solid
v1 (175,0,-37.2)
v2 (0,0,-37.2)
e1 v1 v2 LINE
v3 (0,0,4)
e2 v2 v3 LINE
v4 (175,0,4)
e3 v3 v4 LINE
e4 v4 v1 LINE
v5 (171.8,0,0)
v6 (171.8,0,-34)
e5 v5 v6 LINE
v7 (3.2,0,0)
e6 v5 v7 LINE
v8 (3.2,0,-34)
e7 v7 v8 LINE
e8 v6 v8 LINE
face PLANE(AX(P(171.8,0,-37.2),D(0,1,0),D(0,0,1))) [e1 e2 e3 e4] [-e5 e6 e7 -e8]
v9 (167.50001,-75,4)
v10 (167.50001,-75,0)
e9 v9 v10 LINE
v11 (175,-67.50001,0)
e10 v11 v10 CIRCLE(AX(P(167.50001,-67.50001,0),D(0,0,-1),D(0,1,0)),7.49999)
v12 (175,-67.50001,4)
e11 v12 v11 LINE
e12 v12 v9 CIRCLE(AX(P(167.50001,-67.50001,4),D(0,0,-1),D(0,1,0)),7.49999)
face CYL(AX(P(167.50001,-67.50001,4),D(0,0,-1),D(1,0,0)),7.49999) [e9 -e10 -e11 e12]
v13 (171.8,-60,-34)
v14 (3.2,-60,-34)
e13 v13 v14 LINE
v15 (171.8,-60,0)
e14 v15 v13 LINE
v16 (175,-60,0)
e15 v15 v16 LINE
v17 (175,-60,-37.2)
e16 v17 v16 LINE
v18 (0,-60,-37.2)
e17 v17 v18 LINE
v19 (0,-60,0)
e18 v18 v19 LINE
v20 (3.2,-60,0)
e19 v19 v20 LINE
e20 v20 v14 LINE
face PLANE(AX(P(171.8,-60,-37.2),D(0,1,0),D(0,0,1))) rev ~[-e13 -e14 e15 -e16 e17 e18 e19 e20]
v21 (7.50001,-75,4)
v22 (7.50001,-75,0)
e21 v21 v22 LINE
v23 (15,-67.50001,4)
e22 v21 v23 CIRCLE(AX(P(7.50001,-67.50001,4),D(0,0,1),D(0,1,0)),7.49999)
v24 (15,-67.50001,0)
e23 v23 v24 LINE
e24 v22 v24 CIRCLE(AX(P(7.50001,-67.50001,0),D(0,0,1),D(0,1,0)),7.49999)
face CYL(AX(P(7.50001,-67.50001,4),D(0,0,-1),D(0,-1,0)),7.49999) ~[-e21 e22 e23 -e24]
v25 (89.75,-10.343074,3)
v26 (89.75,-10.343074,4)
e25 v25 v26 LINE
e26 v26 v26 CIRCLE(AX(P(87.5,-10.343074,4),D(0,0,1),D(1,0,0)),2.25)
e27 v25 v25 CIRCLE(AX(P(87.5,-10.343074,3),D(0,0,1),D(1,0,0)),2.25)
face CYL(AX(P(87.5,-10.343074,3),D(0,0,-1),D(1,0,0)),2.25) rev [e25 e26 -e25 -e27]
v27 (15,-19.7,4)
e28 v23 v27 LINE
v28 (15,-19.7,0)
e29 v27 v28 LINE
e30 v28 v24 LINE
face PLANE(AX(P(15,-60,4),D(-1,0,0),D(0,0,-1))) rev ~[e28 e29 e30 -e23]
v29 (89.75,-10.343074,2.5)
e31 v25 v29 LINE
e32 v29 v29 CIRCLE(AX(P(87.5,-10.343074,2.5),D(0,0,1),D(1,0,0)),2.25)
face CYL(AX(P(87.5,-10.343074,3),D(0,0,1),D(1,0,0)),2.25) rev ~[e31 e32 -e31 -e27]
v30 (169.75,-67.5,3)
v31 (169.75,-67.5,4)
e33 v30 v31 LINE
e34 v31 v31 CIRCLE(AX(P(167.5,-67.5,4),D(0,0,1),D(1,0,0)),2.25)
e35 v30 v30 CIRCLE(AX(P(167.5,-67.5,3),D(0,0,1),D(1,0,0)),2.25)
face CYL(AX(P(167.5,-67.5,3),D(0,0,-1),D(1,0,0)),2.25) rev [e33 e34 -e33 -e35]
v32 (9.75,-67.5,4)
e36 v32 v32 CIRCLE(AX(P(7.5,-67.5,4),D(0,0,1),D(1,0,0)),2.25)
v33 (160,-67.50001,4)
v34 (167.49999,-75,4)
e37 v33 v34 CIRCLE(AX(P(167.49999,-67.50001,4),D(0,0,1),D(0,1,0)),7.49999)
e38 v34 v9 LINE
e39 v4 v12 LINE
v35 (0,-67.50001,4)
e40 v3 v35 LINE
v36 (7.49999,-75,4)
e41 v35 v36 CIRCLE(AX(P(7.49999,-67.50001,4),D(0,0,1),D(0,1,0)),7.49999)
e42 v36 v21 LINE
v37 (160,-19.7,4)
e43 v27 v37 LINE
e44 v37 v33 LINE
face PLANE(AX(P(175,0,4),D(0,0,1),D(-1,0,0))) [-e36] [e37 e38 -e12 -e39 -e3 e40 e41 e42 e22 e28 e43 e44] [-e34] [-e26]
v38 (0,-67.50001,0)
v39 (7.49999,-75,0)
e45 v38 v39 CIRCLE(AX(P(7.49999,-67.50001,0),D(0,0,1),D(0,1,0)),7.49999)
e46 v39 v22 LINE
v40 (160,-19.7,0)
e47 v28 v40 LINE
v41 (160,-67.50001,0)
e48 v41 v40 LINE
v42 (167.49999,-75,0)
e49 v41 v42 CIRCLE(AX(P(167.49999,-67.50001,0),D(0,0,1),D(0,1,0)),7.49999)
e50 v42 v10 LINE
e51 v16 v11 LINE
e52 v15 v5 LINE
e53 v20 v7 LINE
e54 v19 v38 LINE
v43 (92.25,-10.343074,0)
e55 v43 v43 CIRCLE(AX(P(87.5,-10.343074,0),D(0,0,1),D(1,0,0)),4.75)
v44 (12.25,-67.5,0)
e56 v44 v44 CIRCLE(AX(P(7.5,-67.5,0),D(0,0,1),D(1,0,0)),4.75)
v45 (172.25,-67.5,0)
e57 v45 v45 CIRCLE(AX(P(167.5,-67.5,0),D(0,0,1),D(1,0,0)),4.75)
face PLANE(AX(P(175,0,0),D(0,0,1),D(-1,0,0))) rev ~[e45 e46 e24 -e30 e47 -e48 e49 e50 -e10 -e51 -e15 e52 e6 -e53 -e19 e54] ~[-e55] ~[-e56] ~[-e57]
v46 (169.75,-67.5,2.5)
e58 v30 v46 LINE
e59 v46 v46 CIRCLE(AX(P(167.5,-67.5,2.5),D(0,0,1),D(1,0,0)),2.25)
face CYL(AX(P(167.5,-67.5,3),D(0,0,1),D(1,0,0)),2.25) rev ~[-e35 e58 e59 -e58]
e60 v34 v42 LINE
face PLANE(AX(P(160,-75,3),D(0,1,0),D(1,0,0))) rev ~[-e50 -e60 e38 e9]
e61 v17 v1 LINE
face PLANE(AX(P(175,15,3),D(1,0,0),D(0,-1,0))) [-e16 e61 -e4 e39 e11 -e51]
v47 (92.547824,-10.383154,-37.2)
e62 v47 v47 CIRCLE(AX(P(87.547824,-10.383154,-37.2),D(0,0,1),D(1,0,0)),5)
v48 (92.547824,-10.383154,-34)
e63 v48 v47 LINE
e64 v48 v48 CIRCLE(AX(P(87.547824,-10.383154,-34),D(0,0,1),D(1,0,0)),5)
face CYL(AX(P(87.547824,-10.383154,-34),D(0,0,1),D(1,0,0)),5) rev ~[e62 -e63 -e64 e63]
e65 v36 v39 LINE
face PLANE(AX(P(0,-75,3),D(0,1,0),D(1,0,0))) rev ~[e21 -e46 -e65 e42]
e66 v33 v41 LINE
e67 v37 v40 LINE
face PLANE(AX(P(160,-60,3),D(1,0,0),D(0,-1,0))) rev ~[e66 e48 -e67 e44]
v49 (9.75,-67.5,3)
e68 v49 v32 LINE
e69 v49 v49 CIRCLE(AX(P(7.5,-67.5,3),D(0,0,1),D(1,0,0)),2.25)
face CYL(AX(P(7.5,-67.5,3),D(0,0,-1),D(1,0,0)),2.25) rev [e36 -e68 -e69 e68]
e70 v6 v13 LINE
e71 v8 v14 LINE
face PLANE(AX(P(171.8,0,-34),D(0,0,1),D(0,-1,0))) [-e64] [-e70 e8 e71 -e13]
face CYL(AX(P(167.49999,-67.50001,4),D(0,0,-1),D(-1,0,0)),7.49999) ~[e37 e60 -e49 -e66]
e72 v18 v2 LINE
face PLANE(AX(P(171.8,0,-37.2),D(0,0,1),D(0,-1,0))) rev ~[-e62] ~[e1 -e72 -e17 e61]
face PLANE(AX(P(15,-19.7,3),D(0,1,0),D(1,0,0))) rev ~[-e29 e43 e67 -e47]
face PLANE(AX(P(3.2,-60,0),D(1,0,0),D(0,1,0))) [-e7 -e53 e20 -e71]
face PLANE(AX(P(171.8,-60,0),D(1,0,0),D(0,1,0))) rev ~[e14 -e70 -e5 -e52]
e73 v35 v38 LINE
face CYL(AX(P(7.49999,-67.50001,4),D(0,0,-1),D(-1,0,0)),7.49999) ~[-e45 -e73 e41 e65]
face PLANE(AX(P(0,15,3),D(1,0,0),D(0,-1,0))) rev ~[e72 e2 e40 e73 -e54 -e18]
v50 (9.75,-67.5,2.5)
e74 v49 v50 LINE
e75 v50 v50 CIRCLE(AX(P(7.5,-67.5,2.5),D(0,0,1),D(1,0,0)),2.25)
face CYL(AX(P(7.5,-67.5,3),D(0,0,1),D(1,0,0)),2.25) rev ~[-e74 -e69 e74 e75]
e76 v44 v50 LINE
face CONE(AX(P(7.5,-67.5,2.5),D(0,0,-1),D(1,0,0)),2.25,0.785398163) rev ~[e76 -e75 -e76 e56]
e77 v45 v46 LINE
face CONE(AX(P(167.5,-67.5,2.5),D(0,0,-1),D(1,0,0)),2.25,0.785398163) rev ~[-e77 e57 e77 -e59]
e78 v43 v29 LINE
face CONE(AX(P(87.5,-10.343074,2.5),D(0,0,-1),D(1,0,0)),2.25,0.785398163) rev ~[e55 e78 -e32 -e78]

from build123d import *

# Parameters (mm, degrees)
F0_W      = 3.2
F0_H      = 60
F0_W_2    = 168.6
F1_DEPTH  = 3
F2_DEPTH  = 37.2
F3_W      = 60
F3_H      = 3.2
F4_DEPTH  = 168.6
F5_W      = 15
F5_H      = 3
F6_DEPTH  = 15
F7_W      = 15
F7_H      = 3
F8_DEPTH  = 15
F9_R      = 2.25
F10_DEPTH = 25
F11_DEPTH = 1
F12_SIZE  = 2.5
F13_W     = 35.8230434358
F13_H     = 13.5607076809
F14_DEPTH = 175.001
F15_R     = 5
F16_DEPTH = 25
F17_R     = 7.49999
F18_DEPTH = 40.3


# Not quite as in the source:
# - a fillet or chamfer is up to 0.001 mm smaller than in the source, because OpenCascade refuses the exact size


with BuildPart() as f1:
    # F0 (on Top) → F1 (new body)
    with BuildSketch(Plane.XY):
        with Locations((1.6, -30)):
            Rectangle(F0_W, F0_H)
        with Locations((87.5, -30)):
            Rectangle(F0_W_2, F0_H)
        with Locations((173.4, -30)):
            Rectangle(F0_W, F0_H)
    extrude(amount=F1_DEPTH)

    # F0 (on Top) → F2 (join)
    with BuildSketch(Plane.XY):
        with Locations((1.6, -30)):
            Rectangle(F0_W, F0_H)
        with Locations((173.4, -30)):
            Rectangle(F0_W, F0_H)
    extrude(amount=-F2_DEPTH)

    # F3 (on face) → F4 (join, through all)
    with BuildSketch(Plane(origin=(171.8, 0, 0), x_dir=(0, -1, 0), z_dir=(-1, 0, 0))):
        with Locations((30, -35.6)):
            Rectangle(F3_W, F3_H)
    extrude(amount=F4_DEPTH)

    # F5 (on face) → F6 (join)
    with BuildSketch(Plane.XZ.offset(60)):
        with Locations((7.5, 1.5)):
            Rectangle(F5_W, F5_H)
        with Locations((167.5, 1.5)):
            Rectangle(F5_W, F5_H)
    extrude(amount=F6_DEPTH)

    # F7 (on face) → F8 (join)
    with BuildSketch(Plane(origin=(0, 0, 0), x_dir=(-1, 0, 0), z_dir=(0, 1, 0))):
        with Locations((-167.5, 1.5)):
            Rectangle(F7_W, F7_H)
        with Locations((-7.5, 1.5)):
            Rectangle(F7_W, F7_H)
    extrude(amount=F8_DEPTH)

    # F9 (on face) → F10 (cut)
    with BuildSketch(Plane.XY.offset(3)):
        with Locations((167.5, 7.5)):
            Circle(F9_R)
        with Locations((167.5, -67.5)):
            Circle(F9_R)
        with Locations((7.5, -67.5)):
            Circle(F9_R)
        with Locations((87.5, -10.3430738673)):
            Circle(F9_R)
    extrude(amount=-F10_DEPTH, mode=Mode.SUBTRACT)

    # F11 (add): a face of the model
    f11_faces = [f1.faces().sort_by_distance(p)[0] for p in [
        (87.3877644613, -29.9749671624, 3),
    ]]
    extrude(f11_faces, amount=F11_DEPTH)

    # F12
    f12_edges = [f1.edges().sort_by_distance(p)[0] for p in [
        (165.25, -67.5, 0),
        (165.25, 7.5, 0),
        (85.25, -10.343074, 0),
        (5.25, -67.5, 0),
    ]]
    chamfer(f12_edges, length=F12_SIZE)

    # F13 (on face) → F14 (cut, through all)
    with BuildSketch(Plane(origin=(0, 0, 0), x_dir=(0, -1, 0), z_dir=(-1, 0, 0))):
        with Locations((-17.9115217179, 6.7803538404)):
            Rectangle(F13_W, F13_H)
    extrude(amount=-F14_DEPTH, mode=Mode.SUBTRACT)

    # F15 (on face) → F16 (cut)
    with BuildSketch(Plane.XY.offset(-34)):
        with Locations((87.5478237867, -10.3831542656)):
            Circle(F15_R)
    extrude(amount=-F16_DEPTH, mode=Mode.SUBTRACT)

    # F17 (radius 7.5 in the source; OpenCascade refuses exactly that, so slightly less here)
    f17_edges = [f1.edges().sort_by_distance(p)[0] for p in [
        (15, -75, 2),
        (0, -75, 2),
        (160, -75, 2),
        (175, -75, 2),
    ]]
    fillet(f17_edges, radius=F17_R)

    # F18 (cut): a face of the model
    f18_faces = [f1.faces().sort_by_distance(p)[0] for p in [
        (87.5, -60, 2),
    ]]
    extrude(f18_faces, amount=-F18_DEPTH, mode=Mode.SUBTRACT)


solid = f1.part
